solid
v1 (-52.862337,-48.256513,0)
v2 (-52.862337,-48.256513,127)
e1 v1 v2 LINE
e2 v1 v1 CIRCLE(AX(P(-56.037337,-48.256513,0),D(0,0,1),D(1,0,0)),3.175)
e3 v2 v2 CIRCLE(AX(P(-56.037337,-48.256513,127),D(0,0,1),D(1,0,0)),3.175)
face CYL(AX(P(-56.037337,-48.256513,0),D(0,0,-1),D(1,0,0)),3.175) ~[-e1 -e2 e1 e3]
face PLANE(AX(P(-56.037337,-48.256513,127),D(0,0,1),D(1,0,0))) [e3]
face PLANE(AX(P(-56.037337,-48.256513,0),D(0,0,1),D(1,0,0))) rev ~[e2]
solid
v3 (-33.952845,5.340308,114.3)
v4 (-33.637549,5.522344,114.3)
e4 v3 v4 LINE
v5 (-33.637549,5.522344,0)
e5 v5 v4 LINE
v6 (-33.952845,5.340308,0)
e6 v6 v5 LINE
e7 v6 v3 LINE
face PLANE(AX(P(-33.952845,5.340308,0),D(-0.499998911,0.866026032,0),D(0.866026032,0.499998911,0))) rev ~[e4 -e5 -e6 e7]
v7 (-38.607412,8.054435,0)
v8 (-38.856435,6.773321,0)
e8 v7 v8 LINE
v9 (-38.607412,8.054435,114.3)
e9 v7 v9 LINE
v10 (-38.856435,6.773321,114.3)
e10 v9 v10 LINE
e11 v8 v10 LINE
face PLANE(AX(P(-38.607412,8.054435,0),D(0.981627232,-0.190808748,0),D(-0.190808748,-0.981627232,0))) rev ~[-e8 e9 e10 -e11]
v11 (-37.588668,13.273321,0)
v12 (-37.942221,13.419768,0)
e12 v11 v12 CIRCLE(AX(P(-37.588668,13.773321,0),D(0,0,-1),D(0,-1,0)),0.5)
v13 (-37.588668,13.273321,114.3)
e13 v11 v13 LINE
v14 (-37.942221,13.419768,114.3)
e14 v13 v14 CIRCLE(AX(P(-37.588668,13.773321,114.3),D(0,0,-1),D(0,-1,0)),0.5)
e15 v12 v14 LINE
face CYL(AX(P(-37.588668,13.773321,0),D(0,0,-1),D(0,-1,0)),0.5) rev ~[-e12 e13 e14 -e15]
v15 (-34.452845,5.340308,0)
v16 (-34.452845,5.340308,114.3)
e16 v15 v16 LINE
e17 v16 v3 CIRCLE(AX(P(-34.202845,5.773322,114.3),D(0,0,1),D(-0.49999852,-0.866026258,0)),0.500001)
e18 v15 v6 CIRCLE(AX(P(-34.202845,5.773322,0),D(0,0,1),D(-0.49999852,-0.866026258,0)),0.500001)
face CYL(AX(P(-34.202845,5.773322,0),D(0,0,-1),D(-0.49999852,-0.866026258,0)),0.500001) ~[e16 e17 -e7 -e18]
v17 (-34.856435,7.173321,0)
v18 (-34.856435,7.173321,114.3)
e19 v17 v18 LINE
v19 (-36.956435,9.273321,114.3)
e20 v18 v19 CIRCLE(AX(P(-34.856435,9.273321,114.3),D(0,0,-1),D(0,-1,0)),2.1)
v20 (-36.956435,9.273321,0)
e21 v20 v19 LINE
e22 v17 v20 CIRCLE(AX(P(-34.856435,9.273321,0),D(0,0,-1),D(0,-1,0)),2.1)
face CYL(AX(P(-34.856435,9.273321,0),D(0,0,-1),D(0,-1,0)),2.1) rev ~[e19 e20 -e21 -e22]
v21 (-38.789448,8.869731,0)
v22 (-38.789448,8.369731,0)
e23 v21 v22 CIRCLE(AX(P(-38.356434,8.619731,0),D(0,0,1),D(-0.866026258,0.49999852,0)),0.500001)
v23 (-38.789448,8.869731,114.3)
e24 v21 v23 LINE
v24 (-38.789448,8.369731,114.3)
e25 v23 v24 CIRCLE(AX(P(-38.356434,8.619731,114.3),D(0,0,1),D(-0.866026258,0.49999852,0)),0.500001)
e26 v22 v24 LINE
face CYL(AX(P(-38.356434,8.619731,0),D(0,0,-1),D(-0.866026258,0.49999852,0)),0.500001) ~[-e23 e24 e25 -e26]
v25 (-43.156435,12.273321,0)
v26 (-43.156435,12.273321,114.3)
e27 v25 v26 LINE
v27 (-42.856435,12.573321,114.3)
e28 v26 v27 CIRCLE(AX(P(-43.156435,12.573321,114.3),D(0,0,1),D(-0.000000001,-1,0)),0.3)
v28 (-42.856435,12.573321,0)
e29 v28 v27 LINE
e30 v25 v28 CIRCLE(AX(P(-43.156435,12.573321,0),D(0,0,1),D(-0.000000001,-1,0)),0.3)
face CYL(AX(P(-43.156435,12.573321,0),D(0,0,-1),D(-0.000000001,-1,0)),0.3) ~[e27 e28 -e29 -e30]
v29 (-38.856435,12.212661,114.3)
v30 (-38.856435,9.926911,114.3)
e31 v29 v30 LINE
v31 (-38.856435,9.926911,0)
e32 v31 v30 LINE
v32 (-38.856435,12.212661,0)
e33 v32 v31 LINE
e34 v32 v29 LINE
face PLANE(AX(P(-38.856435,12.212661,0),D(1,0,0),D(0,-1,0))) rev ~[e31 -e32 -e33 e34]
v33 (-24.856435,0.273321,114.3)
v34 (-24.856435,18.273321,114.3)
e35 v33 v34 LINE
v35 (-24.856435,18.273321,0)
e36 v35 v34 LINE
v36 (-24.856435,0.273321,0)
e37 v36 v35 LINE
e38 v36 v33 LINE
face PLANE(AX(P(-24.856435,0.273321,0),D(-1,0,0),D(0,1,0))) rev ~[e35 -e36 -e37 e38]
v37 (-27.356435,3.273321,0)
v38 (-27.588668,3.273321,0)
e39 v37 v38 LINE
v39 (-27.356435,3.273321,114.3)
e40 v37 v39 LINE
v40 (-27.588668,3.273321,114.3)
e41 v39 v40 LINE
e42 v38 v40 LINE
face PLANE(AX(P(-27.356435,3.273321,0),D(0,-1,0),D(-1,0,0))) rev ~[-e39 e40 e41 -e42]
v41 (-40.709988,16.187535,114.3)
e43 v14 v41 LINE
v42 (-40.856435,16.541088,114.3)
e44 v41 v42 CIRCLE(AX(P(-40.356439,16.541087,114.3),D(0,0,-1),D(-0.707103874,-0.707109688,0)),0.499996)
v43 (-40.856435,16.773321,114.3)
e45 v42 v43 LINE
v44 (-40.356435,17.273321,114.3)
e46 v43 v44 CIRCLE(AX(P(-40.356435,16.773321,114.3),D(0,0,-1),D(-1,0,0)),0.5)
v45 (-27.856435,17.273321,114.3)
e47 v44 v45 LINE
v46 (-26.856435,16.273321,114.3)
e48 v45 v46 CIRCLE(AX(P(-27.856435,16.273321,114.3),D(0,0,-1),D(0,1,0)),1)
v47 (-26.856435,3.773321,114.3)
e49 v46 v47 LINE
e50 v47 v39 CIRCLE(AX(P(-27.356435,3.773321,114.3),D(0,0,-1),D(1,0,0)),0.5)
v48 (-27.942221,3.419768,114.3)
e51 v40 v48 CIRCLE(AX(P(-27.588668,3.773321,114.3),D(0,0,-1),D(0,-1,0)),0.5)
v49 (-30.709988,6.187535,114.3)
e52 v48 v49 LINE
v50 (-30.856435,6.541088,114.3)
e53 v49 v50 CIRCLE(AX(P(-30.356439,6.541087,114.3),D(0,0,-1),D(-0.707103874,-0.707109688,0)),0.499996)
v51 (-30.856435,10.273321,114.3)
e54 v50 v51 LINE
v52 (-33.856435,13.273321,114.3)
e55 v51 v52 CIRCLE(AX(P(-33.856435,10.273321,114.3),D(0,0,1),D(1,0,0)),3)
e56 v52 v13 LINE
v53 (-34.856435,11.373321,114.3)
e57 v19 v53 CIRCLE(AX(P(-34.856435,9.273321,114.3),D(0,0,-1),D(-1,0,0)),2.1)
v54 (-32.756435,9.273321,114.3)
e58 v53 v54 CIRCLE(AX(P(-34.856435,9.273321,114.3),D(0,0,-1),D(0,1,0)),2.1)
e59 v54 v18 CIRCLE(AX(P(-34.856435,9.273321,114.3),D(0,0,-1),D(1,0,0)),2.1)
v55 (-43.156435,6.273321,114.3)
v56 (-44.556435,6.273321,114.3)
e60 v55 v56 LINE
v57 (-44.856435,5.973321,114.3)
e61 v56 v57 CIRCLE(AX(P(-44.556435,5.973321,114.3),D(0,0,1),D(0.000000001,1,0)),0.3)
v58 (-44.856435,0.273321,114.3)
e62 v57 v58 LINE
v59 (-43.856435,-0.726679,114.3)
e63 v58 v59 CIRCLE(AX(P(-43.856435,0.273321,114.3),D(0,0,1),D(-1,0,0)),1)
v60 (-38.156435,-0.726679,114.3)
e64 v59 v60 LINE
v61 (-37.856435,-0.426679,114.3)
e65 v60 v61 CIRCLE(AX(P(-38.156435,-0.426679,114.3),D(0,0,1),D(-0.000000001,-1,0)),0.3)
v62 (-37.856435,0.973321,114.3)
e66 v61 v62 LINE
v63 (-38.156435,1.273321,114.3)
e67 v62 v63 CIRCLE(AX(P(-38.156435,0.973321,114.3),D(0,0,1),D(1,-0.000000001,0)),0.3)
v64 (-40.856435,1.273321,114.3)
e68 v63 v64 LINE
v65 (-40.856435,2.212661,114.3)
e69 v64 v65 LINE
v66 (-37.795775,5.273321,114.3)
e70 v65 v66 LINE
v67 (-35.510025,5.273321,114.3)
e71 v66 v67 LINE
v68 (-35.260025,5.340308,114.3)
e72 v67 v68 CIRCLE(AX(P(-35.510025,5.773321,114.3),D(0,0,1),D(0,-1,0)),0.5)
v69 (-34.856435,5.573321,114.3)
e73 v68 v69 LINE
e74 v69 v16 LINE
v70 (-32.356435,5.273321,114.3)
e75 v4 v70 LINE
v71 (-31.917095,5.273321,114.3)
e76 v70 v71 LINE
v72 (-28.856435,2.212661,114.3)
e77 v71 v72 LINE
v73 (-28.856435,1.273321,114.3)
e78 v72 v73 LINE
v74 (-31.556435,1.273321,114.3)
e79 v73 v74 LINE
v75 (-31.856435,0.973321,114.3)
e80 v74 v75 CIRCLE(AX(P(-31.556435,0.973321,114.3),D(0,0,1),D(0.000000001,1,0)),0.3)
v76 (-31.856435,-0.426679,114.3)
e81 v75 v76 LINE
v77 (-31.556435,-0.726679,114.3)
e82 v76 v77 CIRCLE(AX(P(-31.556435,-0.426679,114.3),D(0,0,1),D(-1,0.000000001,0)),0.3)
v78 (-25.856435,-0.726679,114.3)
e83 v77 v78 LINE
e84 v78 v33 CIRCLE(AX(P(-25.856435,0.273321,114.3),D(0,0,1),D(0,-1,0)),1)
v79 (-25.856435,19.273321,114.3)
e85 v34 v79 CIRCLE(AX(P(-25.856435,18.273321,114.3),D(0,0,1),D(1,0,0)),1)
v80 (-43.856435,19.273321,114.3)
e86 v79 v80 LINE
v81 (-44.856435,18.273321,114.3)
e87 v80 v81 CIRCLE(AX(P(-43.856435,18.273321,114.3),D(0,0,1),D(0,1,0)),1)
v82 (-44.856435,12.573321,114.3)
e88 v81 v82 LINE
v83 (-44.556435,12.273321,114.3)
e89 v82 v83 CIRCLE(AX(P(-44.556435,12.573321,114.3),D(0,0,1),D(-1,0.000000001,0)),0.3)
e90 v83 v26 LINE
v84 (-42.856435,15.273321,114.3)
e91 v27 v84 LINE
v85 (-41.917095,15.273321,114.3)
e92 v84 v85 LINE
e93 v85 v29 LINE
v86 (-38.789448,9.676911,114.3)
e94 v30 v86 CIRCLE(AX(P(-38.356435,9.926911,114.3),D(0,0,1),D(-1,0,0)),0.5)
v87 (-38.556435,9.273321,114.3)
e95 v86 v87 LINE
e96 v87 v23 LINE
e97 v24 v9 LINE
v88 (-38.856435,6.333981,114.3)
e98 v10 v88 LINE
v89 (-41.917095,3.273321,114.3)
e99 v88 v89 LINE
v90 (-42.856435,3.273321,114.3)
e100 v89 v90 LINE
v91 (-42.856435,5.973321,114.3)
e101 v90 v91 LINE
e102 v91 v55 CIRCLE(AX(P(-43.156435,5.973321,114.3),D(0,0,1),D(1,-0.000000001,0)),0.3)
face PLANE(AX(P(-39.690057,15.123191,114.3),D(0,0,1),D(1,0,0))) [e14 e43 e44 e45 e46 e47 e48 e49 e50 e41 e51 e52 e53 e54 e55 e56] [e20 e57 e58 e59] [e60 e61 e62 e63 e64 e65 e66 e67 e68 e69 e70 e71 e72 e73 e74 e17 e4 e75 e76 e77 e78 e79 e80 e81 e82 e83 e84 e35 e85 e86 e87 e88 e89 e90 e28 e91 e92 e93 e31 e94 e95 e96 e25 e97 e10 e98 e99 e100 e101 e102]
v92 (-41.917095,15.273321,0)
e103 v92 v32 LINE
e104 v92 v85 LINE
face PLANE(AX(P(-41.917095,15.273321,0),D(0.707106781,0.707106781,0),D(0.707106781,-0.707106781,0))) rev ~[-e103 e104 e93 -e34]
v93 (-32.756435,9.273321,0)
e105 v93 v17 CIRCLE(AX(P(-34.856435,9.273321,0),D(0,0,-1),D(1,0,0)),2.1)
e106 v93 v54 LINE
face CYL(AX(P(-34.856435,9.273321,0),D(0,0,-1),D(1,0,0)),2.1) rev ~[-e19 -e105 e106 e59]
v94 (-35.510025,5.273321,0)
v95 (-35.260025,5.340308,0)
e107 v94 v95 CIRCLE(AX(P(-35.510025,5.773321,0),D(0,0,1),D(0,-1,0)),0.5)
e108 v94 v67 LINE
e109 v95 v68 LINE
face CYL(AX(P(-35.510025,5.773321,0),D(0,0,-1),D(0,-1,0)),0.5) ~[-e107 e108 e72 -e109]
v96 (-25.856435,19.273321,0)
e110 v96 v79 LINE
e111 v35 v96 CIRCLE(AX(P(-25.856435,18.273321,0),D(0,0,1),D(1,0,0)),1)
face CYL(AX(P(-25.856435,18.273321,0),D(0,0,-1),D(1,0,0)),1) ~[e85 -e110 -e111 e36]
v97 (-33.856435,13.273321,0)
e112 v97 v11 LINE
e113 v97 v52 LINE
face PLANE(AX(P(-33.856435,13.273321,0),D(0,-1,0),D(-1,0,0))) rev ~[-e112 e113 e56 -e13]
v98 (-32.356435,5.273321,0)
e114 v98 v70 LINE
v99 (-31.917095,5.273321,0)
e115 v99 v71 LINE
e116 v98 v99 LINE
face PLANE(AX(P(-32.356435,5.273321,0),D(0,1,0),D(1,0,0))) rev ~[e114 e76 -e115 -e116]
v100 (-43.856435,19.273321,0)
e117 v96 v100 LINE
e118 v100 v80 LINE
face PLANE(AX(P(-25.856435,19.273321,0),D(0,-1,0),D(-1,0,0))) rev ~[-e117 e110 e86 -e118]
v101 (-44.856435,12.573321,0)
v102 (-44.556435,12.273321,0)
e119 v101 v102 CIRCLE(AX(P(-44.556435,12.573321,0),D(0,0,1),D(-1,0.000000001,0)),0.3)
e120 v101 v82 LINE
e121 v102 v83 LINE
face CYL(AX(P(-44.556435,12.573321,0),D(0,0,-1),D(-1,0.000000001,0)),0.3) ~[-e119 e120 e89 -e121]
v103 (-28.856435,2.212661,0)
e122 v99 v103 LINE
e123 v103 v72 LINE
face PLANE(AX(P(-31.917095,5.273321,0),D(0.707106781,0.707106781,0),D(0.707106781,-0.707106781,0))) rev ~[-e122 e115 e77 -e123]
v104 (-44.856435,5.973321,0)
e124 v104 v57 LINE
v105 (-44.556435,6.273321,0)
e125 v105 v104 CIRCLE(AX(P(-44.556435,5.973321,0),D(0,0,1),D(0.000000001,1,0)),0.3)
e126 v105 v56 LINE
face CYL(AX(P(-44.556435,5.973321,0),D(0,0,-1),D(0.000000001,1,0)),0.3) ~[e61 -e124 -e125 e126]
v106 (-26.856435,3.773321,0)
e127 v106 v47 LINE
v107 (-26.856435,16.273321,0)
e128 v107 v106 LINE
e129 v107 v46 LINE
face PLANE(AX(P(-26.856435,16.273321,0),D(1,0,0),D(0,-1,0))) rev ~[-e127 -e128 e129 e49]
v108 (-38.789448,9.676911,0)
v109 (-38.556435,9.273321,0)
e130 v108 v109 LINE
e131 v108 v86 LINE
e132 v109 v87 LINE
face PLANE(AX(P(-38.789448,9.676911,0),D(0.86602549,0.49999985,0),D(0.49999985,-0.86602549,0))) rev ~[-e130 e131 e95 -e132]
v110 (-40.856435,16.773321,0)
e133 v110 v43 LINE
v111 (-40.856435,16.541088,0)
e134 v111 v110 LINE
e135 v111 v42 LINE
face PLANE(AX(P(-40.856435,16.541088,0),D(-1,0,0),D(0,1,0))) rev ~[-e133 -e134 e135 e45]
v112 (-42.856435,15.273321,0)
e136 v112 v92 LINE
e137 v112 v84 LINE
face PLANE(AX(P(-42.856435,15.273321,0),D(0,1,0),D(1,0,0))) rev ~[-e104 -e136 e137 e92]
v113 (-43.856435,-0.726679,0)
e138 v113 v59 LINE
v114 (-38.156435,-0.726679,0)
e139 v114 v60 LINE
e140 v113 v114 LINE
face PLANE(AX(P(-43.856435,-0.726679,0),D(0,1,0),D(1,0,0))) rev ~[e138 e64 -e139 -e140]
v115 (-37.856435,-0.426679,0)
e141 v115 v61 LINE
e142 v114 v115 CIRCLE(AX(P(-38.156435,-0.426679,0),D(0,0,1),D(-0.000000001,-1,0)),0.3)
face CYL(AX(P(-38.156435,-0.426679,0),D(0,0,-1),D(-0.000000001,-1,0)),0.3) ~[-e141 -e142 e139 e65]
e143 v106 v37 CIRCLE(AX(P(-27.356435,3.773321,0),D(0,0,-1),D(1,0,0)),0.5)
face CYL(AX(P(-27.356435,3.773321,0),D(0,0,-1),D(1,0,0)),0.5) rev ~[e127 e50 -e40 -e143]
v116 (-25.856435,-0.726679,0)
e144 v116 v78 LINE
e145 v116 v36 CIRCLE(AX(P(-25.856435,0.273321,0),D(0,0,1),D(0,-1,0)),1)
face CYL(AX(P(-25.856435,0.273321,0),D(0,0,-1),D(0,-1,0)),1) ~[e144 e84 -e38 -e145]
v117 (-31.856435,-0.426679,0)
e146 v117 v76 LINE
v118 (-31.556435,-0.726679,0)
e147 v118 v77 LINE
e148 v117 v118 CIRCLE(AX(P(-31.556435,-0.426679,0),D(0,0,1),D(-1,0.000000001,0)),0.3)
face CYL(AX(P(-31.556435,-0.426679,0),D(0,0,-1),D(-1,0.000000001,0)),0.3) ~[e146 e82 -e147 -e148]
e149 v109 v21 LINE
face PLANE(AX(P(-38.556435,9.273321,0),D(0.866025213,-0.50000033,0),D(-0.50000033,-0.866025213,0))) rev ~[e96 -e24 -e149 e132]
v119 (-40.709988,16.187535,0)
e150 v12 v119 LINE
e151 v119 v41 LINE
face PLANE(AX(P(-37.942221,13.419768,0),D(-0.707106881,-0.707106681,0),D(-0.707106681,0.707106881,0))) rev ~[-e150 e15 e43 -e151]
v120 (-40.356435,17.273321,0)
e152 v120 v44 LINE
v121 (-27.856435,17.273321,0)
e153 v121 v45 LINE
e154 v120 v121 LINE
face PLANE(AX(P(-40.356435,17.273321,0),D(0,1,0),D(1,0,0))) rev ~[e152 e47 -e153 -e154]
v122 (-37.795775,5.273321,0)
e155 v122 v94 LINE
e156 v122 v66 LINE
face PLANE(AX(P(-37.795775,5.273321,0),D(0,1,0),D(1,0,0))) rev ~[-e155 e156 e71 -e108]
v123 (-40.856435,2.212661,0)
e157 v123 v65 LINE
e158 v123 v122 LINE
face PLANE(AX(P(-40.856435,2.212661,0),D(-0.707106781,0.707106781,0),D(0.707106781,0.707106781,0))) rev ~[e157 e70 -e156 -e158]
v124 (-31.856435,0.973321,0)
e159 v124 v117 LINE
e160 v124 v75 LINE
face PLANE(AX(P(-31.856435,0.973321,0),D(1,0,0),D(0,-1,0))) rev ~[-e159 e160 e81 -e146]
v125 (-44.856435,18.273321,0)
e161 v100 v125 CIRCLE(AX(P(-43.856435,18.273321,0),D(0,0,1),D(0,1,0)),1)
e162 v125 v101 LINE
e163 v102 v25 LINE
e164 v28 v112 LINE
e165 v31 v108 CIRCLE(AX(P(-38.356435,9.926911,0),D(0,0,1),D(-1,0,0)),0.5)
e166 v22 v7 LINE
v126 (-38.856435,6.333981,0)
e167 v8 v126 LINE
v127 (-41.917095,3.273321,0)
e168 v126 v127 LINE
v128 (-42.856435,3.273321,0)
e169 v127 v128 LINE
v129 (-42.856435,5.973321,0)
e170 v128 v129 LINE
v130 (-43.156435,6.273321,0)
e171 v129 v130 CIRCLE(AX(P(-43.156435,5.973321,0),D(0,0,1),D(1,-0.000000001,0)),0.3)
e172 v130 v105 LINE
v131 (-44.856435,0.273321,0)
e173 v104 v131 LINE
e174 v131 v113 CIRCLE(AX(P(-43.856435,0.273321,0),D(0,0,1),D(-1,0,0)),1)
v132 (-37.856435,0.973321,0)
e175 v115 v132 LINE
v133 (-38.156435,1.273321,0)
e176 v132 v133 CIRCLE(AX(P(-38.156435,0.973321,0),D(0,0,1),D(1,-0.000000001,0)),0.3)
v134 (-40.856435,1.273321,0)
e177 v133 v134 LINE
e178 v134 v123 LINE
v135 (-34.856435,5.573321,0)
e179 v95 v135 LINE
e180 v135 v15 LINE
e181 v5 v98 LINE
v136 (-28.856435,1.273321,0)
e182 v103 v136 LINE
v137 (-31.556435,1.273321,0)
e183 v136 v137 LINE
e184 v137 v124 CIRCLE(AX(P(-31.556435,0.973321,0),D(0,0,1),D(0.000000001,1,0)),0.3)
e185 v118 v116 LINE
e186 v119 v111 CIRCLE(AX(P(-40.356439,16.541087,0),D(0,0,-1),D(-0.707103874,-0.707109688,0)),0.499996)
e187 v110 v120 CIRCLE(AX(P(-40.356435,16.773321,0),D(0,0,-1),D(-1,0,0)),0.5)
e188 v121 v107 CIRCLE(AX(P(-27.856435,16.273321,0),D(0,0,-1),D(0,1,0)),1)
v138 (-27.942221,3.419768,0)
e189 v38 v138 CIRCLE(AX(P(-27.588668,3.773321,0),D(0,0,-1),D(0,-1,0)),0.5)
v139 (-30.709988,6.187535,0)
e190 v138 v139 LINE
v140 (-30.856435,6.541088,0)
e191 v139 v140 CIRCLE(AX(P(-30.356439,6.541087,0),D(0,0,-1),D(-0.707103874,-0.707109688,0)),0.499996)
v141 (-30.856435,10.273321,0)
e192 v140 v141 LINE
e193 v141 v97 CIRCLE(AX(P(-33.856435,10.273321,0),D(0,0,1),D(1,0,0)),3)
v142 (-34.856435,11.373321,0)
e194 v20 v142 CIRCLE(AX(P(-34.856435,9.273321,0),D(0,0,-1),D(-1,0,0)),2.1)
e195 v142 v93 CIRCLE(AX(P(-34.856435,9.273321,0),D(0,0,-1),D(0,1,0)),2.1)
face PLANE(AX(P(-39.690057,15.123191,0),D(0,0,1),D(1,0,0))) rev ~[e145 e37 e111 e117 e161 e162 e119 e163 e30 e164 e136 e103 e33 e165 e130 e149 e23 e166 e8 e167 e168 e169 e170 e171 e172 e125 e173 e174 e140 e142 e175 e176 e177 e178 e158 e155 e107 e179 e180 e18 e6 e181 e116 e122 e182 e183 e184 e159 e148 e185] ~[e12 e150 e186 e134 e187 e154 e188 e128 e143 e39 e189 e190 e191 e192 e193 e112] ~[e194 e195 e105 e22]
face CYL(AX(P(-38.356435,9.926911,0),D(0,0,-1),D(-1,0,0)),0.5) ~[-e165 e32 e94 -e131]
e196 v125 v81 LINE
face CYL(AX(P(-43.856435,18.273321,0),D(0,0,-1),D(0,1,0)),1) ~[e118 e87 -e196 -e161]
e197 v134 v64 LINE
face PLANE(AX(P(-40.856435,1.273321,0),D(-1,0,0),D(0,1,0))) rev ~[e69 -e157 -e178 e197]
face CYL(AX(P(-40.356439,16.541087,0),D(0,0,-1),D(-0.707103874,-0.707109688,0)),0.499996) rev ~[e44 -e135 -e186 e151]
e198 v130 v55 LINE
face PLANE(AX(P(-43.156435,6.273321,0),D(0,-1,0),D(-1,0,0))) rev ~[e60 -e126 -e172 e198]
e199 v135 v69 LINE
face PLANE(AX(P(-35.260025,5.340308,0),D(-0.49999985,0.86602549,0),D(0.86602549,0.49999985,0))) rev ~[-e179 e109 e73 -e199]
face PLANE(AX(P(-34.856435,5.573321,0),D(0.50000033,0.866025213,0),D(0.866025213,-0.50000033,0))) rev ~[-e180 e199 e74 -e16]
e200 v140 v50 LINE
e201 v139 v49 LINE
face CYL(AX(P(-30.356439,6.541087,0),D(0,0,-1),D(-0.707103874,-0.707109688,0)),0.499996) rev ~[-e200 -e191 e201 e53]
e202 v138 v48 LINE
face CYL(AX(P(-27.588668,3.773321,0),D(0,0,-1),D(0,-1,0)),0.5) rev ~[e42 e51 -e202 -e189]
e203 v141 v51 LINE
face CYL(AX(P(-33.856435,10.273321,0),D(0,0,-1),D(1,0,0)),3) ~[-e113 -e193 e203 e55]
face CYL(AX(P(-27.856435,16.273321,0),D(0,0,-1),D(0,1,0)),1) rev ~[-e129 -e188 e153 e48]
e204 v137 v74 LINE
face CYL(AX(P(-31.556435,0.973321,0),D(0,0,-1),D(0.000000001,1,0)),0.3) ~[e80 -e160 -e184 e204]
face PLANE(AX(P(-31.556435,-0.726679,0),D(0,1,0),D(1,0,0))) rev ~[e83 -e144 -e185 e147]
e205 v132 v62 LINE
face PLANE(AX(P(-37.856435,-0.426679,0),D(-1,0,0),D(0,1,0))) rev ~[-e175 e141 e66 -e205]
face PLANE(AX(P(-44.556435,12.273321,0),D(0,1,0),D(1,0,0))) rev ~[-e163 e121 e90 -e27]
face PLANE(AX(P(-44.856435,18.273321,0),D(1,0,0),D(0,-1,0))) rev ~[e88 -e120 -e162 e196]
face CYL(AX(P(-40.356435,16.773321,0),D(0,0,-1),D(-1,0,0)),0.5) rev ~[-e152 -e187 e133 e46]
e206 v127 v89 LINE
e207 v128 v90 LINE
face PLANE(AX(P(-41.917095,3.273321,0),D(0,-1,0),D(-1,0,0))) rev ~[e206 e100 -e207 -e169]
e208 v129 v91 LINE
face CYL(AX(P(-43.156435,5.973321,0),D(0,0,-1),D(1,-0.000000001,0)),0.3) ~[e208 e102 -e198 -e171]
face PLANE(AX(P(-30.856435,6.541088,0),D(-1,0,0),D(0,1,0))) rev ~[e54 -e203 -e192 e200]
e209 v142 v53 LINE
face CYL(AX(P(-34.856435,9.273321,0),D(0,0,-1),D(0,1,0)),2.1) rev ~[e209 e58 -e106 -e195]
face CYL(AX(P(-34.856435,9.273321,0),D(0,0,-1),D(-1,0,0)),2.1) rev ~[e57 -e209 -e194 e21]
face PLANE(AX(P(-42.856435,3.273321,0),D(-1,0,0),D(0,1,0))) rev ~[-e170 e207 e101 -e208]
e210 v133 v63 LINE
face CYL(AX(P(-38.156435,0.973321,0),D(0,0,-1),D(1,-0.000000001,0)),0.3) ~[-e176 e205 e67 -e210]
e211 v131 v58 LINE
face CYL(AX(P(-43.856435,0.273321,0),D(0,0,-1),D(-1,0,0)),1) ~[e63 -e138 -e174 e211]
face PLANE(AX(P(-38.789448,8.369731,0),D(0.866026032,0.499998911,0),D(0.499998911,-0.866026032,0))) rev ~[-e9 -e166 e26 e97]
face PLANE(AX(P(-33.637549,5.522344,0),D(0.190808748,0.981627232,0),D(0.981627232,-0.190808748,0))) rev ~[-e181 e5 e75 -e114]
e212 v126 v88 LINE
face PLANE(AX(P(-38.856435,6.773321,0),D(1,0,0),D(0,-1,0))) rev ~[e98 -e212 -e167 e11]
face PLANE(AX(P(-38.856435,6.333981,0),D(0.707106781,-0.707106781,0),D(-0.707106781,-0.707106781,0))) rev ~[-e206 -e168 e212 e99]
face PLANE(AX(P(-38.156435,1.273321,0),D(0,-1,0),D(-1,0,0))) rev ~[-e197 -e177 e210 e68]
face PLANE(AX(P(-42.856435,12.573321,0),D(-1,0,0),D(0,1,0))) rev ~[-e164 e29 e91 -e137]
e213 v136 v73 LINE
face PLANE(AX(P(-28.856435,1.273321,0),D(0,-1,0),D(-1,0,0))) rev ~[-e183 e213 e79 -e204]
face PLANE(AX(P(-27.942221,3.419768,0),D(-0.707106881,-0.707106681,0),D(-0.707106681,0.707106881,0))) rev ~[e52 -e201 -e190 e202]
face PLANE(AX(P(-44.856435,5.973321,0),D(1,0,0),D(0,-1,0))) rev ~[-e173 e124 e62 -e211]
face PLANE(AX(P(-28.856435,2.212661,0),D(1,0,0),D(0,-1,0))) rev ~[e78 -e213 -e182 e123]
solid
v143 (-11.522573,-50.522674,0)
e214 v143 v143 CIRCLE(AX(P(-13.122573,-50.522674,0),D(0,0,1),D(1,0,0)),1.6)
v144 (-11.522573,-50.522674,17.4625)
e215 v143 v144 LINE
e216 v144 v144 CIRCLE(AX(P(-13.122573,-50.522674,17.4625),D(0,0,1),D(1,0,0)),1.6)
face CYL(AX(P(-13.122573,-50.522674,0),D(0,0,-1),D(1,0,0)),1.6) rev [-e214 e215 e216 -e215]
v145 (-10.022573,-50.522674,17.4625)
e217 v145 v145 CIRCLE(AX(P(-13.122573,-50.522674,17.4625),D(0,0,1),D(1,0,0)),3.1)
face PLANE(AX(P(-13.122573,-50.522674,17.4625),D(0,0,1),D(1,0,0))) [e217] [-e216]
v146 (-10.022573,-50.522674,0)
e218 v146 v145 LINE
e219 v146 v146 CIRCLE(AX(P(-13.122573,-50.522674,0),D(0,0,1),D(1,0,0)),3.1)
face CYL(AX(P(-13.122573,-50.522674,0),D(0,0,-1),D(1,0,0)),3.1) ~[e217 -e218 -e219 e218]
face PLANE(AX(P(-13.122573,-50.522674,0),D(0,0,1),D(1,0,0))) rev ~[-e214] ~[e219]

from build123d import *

# Parameters (mm, degrees)
F0_R     = 3.175
F1_DEPTH = 127
F3_DEPTH = 114.3
F0_R_2   = 3.1
F0_R_3   = 1.6
F4_DEPTH = 17.4625


# Not quite as in the source:
# - ends of sketch curves that miss each other by under 0.0002 mm in the source are joined
# - a length typed as a fraction of an inch, garbled in the dataset ("3 / 203.2 mm" for 3/8 in), is restored


with BuildPart() as f1:
    # F0 (on Top) → F1 (new body)
    with BuildSketch(Plane.XY):
        with Locations((-56.0373365879, -48.2565127313)):
            Circle(F0_R)
    extrude(amount=F1_DEPTH)


with BuildPart() as f3:
    # F2 (on Top) → F3 (new body)
    with BuildSketch(Plane.XY):
        with BuildLine():
            Line((-34.856435, 17.273321), (-34.856435, 19.273321))
            Line((-34.856435, 19.273321), (-43.856435, 19.273321))
            ThreePointArc((-43.856435, 19.273321), (-44.5635417812, 18.9804277812), (-44.856435, 18.273321))
            Line((-44.856435, 18.273321), (-44.856435, 12.573321))
            ThreePointArc((-44.856435, 12.573321), (-44.7685670344, 12.3611889656), (-44.556435, 12.273321))
            Line((-44.556435, 12.273321), (-43.156435, 12.273321))
            ThreePointArc((-43.156435, 12.273321), (-42.9443029656, 12.3611889656), (-42.856435, 12.573321))
            Line((-42.856435, 12.573321), (-42.856435, 15.273321))
            Line((-42.856435, 15.273321), (-41.917095, 15.273321))
            Line((-41.917095, 15.273321), (-38.856435, 12.212661))
            Line((-38.856435, 12.212661), (-38.856435, 9.926911))
            ThreePointArc((-38.856435, 9.926911), (-38.8393979324, 9.7975015494), (-38.7894477764, 9.6769111291))
            Line((-38.7894477764, 9.6769111291), (-38.556435, 9.273321))
            Line((-38.556435, 9.273321), (-36.956435, 9.273321))
            ThreePointArc((-36.956435, 9.273321), (-36.3413592405, 10.7582452405), (-34.856435, 11.373321))
            Line((-34.856435, 11.373321), (-34.856435, 13.273321))
            Line((-34.856435, 13.273321), (-37.588668, 13.273321))
            ThreePointArc((-37.588668, 13.273321), (-37.7800097162, 13.3113812337), (-37.9422213906, 13.4197676094))
            Line((-37.9422213906, 13.4197676094), (-40.709988, 16.187535))
            ThreePointArc((-40.709988, 16.187535), (-40.8183747663, 16.3497462838), (-40.856435, 16.541088))
            Line((-40.856435, 16.541088), (-40.856435, 16.773321))
            ThreePointArc((-40.856435, 16.773321), (-40.7099883906, 17.1268743906), (-40.356435, 17.273321))
            Line((-40.356435, 17.273321), (-34.856435, 17.273321))
        make_face()
        with BuildLine():
            Line((-25.856435, 19.273321), (-34.856435, 19.273321))
            Line((-34.856435, 19.273321), (-34.856435, 17.273321))
            Line((-34.856435, 17.273321), (-27.856435, 17.273321))
            ThreePointArc((-27.856435, 17.273321), (-27.1493282188, 16.9804277812), (-26.856435, 16.273321))
            Line((-26.856435, 16.273321), (-26.856435, 9.273321))
            Line((-26.856435, 9.273321), (-24.856435, 9.273321))
            Line((-24.856435, 9.273321), (-24.856435, 18.273321))
            ThreePointArc((-24.856435, 18.273321), (-25.1493282188, 18.9804277812), (-25.856435, 19.273321))
        make_face()
        with BuildLine():
            Line((-24.856435, 0.273321), (-24.856435, 9.273321))
            Line((-24.856435, 9.273321), (-26.856435, 9.273321))
            Line((-26.856435, 9.273321), (-26.856435, 3.773321))
            ThreePointArc((-26.856435, 3.773321), (-27.0028816094, 3.4197676094), (-27.356435, 3.273321))
            Line((-27.356435, 3.273321), (-27.588668, 3.273321))
            ThreePointArc((-27.588668, 3.273321), (-27.7800097162, 3.3113812337), (-27.9422213906, 3.4197676094))
            Line((-27.9422213906, 3.4197676094), (-30.709988, 6.187535))
            ThreePointArc((-30.709988, 6.187535), (-30.8183747663, 6.3497462838), (-30.856435, 6.541088))
            Line((-30.856435, 6.541088), (-30.856435, 9.273321))
            Line((-30.856435, 9.273321), (-32.756435, 9.273321))
            ThreePointArc((-32.756435, 9.273321), (-33.3715107595, 7.7883967595), (-34.856435, 7.173321))
            Line((-34.856435, 7.173321), (-34.856435, 5.573321))
            Line((-34.856435, 5.573321), (-34.452845, 5.340308))
            ThreePointArc((-34.452845, 5.340308), (-34.202845, 5.273321), (-33.9528451291, 5.3403082236))
            Line((-33.9528451291, 5.3403082236), (-33.637549, 5.522344))
            Line((-33.637549, 5.522344), (-32.356435, 5.273321))
            Line((-32.356435, 5.273321), (-31.917095, 5.273321))
            Line((-31.917095, 5.273321), (-28.856435, 2.212661))
            Line((-28.856435, 2.212661), (-28.856435, 1.273321))
            Line((-28.856435, 1.273321), (-31.556435, 1.273321))
            ThreePointArc((-31.556435, 1.273321), (-31.7685670344, 1.1854530344), (-31.856435, 0.973321))
            Line((-31.856435, 0.973321), (-31.856435, -0.426679))
            ThreePointArc((-31.856435, -0.426679), (-31.7685670344, -0.6388110344), (-31.556435, -0.726679))
            Line((-31.556435, -0.726679), (-25.856435, -0.726679))
            ThreePointArc((-25.856435, -0.726679), (-25.1493282188, -0.4337857812), (-24.856435, 0.273321))
        make_face()
        with BuildLine():
            Line((-33.856435, 13.273321), (-34.856435, 13.273321))
            Line((-34.856435, 13.273321), (-34.856435, 11.373321))
            ThreePointArc((-34.856435, 11.373321), (-33.3715107595, 10.7582452405), (-32.756435, 9.273321))
            Line((-32.756435, 9.273321), (-30.856435, 9.273321))
            Line((-30.856435, 9.273321), (-30.856435, 10.273321))
            ThreePointArc((-30.856435, 10.273321), (-31.7351146564, 12.3946413436), (-33.856435, 13.273321))
        make_face()
        with BuildLine():
            ThreePointArc((-34.856435, 7.173321), (-36.3413592405, 7.7883967595), (-36.956435, 9.273321))
            Line((-36.956435, 9.273321), (-38.556435, 9.273321))
            Line((-38.556435, 9.273321), (-38.789448, 8.869731))
            ThreePointArc((-38.789448, 8.869731), (-38.856435, 8.619731), (-38.7894477764, 8.3697311291))
            Line((-38.7894477764, 8.3697311291), (-38.607412, 8.054435))
            Line((-38.607412, 8.054435), (-38.856435, 6.773321))
            Line((-38.856435, 6.773321), (-38.856435, 6.333981))
            Line((-38.856435, 6.333981), (-41.917095, 3.273321))
            Line((-41.917095, 3.273321), (-42.856435, 3.273321))
            Line((-42.856435, 3.273321), (-42.856435, 5.973321))
            ThreePointArc((-42.856435, 5.973321), (-42.9443029656, 6.1854530344), (-43.156435, 6.273321))
            Line((-43.156435, 6.273321), (-44.556435, 6.273321))
            ThreePointArc((-44.556435, 6.273321), (-44.7685670344, 6.1854530344), (-44.856435, 5.973321))
            Line((-44.856435, 5.973321), (-44.856435, 0.273321))
            ThreePointArc((-44.856435, 0.273321), (-44.5635417812, -0.4337857812), (-43.856435, -0.726679))
            Line((-43.856435, -0.726679), (-38.156435, -0.726679))
            ThreePointArc((-38.156435, -0.726679), (-37.9443029656, -0.6388110344), (-37.856435, -0.426679))
            Line((-37.856435, -0.426679), (-37.856435, 0.973321))
            ThreePointArc((-37.856435, 0.973321), (-37.9443029656, 1.1854530344), (-38.156435, 1.273321))
            Line((-38.156435, 1.273321), (-40.856435, 1.273321))
            Line((-40.856435, 1.273321), (-40.856435, 2.212661))
            Line((-40.856435, 2.212661), (-37.795775, 5.273321))
            Line((-37.795775, 5.273321), (-35.510025, 5.273321))
            ThreePointArc((-35.510025, 5.273321), (-35.3806155494, 5.2903580676), (-35.2600251291, 5.3403082236))
            Line((-35.2600251291, 5.3403082236), (-34.856435, 5.573321))
            Line((-34.856435, 5.573321), (-34.856435, 7.173321))
        make_face()
    extrude(amount=F3_DEPTH)


with BuildPart() as f4:
    # F0 (on Top) → F4 (new body)
    with BuildSketch(Plane.XY):
        with Locations((-13.1225734949, -50.5226738751)):
            Circle(F0_R_2)
        with Locations((-13.1225734949, -50.5226738751)):
            Circle(F0_R_3, mode=Mode.SUBTRACT)
    extrude(amount=F4_DEPTH)


solid = Compound([f1.part, f3.part, f4.part])
